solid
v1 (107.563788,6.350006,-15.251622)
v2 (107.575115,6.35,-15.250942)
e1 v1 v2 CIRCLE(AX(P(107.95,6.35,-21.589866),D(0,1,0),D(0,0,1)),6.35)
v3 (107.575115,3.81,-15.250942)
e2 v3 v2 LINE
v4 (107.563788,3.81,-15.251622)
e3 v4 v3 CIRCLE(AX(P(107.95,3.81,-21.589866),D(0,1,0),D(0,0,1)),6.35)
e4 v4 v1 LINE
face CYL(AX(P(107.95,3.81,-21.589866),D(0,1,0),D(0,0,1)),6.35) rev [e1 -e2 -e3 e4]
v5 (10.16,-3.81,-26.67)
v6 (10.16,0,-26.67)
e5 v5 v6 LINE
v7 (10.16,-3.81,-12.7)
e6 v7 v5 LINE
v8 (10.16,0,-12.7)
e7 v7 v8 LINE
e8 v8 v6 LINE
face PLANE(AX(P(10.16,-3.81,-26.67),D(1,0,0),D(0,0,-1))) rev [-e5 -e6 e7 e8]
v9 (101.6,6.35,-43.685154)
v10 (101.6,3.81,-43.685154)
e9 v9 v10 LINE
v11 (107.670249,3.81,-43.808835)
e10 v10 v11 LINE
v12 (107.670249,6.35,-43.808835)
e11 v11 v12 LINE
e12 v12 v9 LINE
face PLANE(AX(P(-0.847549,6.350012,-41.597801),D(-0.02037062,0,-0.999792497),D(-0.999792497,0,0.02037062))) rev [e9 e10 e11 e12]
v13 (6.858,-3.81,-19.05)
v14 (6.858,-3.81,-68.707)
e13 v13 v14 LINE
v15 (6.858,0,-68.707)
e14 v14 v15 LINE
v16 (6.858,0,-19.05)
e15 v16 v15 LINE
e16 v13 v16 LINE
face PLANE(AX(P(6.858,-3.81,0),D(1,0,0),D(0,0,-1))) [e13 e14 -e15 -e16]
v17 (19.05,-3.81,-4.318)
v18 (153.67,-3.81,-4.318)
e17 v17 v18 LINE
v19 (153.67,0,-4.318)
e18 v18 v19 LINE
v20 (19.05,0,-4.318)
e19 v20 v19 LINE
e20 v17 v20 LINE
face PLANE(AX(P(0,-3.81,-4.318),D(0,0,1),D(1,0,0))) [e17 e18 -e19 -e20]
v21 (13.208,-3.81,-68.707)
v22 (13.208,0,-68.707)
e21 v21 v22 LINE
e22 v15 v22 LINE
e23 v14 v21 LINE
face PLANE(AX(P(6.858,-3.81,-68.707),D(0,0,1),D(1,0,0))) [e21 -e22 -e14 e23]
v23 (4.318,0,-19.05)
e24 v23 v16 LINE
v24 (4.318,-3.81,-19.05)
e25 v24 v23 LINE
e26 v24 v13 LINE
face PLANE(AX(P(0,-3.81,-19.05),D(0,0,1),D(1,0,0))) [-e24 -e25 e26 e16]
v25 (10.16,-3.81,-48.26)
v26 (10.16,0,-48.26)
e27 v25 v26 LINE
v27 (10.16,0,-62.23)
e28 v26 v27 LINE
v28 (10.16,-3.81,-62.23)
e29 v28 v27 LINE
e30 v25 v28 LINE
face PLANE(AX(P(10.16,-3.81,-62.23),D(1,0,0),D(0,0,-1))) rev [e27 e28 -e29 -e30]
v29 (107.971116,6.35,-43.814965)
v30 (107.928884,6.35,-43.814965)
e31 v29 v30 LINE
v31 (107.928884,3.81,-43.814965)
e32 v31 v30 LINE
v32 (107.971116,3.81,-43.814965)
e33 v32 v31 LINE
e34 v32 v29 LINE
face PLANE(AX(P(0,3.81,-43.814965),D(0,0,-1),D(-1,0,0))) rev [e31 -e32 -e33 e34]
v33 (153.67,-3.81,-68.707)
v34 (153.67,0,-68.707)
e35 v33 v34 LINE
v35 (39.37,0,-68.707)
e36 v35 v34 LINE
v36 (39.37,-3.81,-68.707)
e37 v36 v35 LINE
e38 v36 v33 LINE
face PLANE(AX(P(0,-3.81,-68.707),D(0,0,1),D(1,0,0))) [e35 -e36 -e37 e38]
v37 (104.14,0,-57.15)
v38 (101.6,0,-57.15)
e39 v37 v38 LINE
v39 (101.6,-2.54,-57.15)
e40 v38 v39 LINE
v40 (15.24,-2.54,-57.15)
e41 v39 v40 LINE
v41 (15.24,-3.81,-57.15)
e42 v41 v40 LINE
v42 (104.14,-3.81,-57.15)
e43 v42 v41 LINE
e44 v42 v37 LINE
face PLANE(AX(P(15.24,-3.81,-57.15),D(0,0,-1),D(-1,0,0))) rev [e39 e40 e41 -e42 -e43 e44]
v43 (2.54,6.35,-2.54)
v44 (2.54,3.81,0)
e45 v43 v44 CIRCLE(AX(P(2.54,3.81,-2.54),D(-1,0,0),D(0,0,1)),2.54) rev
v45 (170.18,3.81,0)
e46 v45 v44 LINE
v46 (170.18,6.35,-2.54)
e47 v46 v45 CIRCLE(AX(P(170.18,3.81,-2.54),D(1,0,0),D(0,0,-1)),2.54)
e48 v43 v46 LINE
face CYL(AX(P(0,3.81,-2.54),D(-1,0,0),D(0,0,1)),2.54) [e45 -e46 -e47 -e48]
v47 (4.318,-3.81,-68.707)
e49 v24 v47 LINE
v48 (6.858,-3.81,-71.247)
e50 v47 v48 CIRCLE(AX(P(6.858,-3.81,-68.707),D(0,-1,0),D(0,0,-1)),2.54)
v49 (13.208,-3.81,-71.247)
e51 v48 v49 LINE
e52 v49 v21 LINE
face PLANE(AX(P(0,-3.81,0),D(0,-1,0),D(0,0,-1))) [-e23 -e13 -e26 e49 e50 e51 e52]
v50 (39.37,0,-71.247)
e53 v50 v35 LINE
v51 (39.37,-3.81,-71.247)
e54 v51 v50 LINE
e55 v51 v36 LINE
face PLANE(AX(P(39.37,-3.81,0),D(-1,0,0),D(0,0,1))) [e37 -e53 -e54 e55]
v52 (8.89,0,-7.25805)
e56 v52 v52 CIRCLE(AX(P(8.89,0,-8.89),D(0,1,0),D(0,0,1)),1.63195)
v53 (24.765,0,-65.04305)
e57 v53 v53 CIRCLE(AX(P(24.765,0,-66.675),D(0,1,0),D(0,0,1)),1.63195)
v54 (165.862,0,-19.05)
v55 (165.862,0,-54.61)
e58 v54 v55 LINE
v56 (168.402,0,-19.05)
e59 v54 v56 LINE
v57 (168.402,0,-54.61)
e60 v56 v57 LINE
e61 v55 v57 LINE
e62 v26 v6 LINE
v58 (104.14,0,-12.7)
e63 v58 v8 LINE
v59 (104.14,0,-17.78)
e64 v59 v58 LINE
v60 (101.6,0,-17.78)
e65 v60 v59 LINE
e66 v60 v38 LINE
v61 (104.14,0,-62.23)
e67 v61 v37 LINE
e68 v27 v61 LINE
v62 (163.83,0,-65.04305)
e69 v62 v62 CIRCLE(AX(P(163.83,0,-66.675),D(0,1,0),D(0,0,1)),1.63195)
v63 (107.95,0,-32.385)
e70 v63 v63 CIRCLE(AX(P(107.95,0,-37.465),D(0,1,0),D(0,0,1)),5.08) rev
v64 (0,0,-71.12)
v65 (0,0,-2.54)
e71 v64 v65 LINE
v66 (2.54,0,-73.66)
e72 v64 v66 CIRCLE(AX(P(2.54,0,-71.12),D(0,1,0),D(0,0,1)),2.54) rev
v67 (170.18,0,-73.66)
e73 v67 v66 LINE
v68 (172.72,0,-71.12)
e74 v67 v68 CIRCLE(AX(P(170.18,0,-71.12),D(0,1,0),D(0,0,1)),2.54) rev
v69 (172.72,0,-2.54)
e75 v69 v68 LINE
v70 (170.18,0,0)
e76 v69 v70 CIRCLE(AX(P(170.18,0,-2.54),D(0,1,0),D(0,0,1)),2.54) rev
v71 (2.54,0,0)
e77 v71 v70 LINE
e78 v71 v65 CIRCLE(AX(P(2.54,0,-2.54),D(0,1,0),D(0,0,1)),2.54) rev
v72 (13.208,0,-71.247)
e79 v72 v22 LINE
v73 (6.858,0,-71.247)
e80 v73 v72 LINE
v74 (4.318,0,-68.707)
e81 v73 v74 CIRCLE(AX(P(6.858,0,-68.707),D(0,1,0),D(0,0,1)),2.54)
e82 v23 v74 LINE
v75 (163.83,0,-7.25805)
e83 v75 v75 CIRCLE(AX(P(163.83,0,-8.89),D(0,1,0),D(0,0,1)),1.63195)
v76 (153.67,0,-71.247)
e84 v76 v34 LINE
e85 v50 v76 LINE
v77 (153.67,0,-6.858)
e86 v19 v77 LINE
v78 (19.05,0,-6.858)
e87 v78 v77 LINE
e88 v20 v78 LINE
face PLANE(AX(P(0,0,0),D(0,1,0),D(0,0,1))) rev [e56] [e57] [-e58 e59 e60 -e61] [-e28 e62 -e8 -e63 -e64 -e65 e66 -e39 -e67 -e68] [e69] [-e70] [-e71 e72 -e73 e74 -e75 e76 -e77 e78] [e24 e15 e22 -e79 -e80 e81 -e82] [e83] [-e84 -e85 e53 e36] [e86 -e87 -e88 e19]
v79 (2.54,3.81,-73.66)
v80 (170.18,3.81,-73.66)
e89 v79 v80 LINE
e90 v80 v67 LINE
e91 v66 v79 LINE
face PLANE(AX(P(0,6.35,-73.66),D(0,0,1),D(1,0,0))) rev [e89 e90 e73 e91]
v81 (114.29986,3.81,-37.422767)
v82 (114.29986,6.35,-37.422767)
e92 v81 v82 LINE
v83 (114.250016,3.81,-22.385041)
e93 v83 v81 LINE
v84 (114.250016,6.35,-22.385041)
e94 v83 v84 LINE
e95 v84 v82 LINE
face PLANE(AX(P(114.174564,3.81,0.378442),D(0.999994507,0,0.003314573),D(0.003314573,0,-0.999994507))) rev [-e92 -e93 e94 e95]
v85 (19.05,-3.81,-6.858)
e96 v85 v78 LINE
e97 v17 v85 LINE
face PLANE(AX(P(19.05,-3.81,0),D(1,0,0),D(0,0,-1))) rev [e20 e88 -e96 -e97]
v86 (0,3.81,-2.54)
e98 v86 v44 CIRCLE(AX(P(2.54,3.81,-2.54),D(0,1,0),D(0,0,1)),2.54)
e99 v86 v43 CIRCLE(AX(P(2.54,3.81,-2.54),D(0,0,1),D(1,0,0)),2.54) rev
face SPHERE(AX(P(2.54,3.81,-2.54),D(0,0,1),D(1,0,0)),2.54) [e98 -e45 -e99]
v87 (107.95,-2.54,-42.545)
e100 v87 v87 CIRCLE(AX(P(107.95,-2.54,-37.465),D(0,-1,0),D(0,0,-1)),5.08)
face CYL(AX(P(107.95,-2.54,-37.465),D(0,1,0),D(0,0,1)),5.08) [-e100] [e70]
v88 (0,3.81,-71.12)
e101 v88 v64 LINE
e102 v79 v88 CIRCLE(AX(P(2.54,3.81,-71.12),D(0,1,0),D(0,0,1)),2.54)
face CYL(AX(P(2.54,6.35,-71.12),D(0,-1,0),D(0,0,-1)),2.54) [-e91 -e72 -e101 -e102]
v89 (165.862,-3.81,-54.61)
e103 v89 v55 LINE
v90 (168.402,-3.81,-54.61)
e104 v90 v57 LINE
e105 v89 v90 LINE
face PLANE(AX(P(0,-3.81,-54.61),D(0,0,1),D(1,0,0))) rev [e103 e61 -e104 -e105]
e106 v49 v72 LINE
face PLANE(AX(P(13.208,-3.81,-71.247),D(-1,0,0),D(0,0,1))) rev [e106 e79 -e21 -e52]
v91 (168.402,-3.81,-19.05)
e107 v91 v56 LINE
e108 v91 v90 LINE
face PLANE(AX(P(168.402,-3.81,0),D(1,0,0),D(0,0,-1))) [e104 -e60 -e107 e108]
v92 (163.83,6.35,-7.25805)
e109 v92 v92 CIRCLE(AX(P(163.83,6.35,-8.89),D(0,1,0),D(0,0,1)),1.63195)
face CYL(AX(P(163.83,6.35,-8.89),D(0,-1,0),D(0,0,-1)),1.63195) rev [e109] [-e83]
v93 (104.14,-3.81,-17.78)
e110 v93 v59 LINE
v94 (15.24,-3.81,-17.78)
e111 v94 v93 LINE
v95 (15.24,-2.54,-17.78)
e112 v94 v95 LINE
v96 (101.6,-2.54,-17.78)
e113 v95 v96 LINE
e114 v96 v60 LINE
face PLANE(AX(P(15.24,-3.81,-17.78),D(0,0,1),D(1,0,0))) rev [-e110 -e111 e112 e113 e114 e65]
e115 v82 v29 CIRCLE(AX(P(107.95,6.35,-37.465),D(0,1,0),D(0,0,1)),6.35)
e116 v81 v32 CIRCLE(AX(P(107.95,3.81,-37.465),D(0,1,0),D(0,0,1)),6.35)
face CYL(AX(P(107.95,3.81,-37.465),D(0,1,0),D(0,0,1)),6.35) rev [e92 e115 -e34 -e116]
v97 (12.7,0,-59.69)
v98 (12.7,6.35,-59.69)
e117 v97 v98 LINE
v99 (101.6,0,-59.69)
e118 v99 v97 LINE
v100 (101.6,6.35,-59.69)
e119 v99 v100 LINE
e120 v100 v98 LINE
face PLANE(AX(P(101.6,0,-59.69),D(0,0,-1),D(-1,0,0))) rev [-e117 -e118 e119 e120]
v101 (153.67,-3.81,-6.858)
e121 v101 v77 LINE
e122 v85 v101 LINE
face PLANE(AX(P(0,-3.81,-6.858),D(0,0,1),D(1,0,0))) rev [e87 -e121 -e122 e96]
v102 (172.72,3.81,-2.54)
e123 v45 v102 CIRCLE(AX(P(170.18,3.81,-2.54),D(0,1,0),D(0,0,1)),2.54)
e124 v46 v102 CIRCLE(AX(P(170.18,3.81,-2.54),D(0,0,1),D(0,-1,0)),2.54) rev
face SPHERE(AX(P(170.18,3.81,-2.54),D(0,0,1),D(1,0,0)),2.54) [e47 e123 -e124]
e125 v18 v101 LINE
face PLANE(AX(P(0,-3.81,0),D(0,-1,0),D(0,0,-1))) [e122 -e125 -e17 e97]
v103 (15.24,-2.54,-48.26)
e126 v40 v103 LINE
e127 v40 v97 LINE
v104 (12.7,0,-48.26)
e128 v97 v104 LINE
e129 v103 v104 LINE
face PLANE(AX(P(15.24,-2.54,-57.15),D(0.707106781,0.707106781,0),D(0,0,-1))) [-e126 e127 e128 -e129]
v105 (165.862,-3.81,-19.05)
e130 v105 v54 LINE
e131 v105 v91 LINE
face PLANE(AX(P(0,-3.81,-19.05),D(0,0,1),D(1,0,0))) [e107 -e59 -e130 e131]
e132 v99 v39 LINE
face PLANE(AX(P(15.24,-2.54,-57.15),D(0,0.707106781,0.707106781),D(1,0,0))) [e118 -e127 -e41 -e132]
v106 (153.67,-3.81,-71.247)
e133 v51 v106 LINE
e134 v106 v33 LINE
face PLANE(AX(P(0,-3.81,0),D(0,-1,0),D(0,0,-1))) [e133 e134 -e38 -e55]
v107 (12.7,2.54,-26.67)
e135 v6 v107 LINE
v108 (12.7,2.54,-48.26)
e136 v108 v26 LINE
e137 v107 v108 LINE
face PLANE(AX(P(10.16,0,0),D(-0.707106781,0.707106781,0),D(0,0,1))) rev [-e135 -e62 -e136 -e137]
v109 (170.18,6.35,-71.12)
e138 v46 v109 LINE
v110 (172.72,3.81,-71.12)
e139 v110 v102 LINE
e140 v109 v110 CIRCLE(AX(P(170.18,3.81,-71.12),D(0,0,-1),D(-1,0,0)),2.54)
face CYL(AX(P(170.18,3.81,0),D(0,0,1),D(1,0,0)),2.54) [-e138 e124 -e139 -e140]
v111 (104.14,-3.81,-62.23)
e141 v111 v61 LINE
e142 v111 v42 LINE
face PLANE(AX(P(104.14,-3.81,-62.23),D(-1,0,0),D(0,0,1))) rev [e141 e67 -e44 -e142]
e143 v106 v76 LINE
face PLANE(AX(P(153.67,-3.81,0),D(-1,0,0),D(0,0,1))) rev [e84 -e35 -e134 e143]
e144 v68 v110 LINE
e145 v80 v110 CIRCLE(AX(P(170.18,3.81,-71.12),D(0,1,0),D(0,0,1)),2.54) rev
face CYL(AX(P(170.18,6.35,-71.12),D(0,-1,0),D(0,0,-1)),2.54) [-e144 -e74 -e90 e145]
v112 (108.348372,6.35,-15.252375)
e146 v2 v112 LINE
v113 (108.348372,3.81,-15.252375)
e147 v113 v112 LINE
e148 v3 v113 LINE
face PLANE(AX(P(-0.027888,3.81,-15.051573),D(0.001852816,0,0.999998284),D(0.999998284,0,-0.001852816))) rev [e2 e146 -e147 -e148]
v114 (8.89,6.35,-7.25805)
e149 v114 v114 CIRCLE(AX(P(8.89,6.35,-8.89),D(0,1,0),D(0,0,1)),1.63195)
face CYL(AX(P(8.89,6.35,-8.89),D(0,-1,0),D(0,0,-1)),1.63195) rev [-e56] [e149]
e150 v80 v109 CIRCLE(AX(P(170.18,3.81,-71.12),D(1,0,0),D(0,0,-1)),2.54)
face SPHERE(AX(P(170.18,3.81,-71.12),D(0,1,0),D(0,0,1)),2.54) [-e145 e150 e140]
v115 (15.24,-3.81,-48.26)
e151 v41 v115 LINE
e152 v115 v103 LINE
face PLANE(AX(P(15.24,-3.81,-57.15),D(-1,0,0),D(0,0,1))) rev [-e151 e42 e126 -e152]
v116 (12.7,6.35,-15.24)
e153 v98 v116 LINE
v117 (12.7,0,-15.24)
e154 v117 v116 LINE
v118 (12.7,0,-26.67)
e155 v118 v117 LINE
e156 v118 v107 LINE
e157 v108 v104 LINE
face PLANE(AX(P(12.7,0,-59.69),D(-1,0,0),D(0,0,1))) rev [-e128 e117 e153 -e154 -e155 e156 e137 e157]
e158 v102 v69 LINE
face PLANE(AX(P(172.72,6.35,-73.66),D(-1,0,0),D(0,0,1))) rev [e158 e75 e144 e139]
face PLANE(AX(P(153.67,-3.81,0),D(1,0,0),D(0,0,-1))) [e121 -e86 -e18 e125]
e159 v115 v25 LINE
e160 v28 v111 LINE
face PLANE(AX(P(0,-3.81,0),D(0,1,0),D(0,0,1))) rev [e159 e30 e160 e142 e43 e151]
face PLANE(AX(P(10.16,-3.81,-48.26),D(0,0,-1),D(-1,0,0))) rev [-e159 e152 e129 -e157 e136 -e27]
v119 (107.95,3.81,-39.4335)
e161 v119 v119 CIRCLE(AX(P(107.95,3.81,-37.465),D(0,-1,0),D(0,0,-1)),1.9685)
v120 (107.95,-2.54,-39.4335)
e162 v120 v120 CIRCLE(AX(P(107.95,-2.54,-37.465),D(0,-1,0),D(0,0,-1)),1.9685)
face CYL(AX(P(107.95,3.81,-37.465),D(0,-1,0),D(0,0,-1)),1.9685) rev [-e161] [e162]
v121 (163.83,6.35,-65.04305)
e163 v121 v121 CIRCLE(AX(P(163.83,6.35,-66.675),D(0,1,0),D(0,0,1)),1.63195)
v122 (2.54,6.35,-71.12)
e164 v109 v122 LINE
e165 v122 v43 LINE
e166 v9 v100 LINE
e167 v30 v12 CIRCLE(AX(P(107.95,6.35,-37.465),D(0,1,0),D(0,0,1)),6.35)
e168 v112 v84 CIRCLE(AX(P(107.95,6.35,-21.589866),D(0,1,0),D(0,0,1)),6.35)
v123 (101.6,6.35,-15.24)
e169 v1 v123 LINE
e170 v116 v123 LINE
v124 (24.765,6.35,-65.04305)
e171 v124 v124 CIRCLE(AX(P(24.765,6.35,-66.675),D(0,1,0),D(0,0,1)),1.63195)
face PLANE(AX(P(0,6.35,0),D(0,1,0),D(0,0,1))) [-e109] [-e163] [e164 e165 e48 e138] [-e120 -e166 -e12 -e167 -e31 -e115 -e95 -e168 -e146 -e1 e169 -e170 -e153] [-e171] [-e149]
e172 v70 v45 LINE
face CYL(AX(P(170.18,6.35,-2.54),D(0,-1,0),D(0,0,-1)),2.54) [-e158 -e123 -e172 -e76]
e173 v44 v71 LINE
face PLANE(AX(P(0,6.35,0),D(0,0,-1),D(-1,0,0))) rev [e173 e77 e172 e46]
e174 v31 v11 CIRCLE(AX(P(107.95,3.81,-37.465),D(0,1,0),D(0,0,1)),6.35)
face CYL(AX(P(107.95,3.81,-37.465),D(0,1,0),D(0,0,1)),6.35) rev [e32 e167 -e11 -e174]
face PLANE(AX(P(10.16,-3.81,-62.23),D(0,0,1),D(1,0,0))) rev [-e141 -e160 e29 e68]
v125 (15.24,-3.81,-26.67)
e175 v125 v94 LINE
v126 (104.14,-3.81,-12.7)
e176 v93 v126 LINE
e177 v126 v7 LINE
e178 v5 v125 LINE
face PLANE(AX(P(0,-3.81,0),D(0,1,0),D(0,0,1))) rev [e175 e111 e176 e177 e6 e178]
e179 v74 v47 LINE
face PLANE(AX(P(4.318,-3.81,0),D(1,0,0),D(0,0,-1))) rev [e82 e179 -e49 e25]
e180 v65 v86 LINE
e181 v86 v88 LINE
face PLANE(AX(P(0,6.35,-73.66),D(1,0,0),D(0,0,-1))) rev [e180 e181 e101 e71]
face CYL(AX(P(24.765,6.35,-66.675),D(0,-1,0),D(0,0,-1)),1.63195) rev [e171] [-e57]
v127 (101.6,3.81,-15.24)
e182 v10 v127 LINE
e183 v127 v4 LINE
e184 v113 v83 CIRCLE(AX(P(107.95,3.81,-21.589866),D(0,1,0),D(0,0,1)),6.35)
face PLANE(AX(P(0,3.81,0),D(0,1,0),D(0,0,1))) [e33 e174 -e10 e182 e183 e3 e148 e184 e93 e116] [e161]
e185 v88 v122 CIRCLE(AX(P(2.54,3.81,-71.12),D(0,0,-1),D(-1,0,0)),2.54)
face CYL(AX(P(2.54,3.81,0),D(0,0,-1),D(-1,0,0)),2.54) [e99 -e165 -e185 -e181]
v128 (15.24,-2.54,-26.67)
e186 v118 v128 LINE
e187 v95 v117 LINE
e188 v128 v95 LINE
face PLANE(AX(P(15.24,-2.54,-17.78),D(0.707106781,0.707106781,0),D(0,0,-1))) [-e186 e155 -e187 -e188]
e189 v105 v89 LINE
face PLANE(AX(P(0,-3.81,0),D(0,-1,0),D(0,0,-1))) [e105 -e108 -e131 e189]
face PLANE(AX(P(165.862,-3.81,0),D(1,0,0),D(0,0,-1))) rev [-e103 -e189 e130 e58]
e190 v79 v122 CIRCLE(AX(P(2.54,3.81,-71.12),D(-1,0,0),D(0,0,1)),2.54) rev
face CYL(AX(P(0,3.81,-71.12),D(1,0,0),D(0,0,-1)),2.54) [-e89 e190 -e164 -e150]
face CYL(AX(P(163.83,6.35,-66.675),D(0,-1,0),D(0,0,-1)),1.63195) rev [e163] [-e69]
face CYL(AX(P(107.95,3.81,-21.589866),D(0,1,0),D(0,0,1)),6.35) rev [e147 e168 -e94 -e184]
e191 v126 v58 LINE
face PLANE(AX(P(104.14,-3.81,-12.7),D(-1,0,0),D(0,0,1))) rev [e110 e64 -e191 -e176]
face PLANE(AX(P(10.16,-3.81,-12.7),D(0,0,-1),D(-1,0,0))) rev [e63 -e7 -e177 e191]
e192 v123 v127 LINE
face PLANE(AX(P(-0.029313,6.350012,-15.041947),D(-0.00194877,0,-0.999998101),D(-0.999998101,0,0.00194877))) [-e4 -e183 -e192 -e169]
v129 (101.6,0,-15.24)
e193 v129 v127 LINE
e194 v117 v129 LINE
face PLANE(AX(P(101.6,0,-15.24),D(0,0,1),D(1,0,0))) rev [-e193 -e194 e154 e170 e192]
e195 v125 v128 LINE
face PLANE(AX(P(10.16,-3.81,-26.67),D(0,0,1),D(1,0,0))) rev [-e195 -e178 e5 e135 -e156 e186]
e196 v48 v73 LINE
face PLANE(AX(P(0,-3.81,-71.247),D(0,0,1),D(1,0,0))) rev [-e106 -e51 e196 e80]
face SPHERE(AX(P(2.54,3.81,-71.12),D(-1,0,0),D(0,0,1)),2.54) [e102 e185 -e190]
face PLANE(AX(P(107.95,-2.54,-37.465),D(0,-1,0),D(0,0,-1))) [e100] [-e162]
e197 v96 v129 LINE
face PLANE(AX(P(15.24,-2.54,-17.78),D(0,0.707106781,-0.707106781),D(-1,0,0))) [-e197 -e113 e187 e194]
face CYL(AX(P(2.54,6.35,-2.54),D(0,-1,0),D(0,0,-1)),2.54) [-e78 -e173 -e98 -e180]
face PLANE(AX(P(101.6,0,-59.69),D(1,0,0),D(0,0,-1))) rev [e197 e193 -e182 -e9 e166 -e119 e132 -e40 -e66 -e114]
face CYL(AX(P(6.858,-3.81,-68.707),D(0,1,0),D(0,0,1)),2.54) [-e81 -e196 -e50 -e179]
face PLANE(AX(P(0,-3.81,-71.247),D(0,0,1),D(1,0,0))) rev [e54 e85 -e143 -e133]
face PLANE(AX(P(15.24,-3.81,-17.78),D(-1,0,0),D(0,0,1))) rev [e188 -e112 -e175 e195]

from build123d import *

# Parameters (mm, degrees)
SKETCH1_W               = 172.72
SKETCH1_H               = 73.66
SKETCH1_R               = 1.63195
BOSS_EXTRUDE1_DEPTH     = 6.35
SKETCH2_W               = 88.9
SKETCH2_H               = 44.45
CUT_EXTRUDE1_DEPTH      = 6.35
FILLET1_R               = 2.54
BOSS_EXTRUDE2_DEPTH     = 3.81
CHAMFER1_SIZE           = 2.54
CHAMFER2_SIZE           = 2.54
CUT_EXTRUDE3_DEPTH      = 189.045791232
CUT_EXTRUDE3_DEPTH_BACK = 2.54
CUT_EXTRUDE4_DEPTH      = 189.045791232
CUT_EXTRUDE4_DEPTH_BACK = 2.54
SKETCH8_R               = 5.08
BOSS_EXTRUDE3_DEPTH     = 2.54
SKETCH9_R               = 1.9685
CUT_EXTRUDE5_DEPTH      = 6.35
SKETCH10_W              = 134.62
SKETCH10_H              = 2.54
SKETCH10_W_2            = 114.3
SKETCH10_W_3            = 2.54
SKETCH10_H_2            = 35.56
SKETCH10_H_3            = 52.197
SKETCH10_W_4            = 6.35
BOSS_EXTRUDE4_DEPTH     = 3.81
FILLET2_R               = 2.54


with BuildPart() as part:
    # Sketch1 → Boss-Extrude1 (new body)
    with BuildSketch(Plane(origin=(0, 0, 0), x_dir=(1, 0, 0), z_dir=(0, 1, 0))):
        with Locations((86.36, 36.83)):
            Rectangle(SKETCH1_W, SKETCH1_H)
        with Locations(Location((24.765, 66.675, 0), (0, 0, 270))):
            Circle(SKETCH1_R, mode=Mode.SUBTRACT)
        with Locations(Location((8.89, 8.89, 0), (0, 0, 270))):
            Circle(SKETCH1_R, mode=Mode.SUBTRACT)
        with Locations(Location((163.83, 66.675, 0), (0, 0, 270))):
            Circle(SKETCH1_R, mode=Mode.SUBTRACT)
        with Locations(Location((163.83, 8.89, 0), (0, 0, 270))):
            Circle(SKETCH1_R, mode=Mode.SUBTRACT)
    extrude(amount=BOSS_EXTRUDE1_DEPTH)

    # Sketch2 → Cut-Extrude1 (cut)
    with BuildSketch(Plane(origin=(0, 6.35, 0), x_dir=(1, 0, 0), z_dir=(0, 1, 0))):
        with Locations((57.15, 37.465)):
            Rectangle(SKETCH2_W, SKETCH2_H)
    extrude(amount=-CUT_EXTRUDE1_DEPTH, mode=Mode.SUBTRACT)

    # Fillet1
    fillet1_edges = [part.edges().sort_by_distance(p)[0] for p in [
        (172.72, 6.35, -36.83),
        (86.36, 6.35, -73.66),
        (0, 6.35, -36.83),
        (0, 3.175, -73.66),
        (172.72, 3.175, -73.66),
        (172.72, 3.175, 0),
        (0, 3.175, 0),
        (86.36, 6.35, 0),
    ]]
    fillet(fillet1_edges, radius=FILLET1_R)

    # Sketch3 → Boss-Extrude2 (add)
    with BuildSketch(Plane.XZ):
        Polygon((10.16, -12.7), (104.14, -12.7), (104.14, -17.78), (15.24, -17.78), (15.24, -26.67), (10.16, -26.67), align=None)
        Polygon((10.16, -62.23), (104.14, -62.23), (104.14, -57.15), (15.24, -57.15), (15.24, -48.26), (10.16, -48.26), align=None)
    extrude(amount=BOSS_EXTRUDE2_DEPTH)

    # Chamfer1
    chamfer1_edges = [part.edges().sort_by_distance(p)[0] for p in [
        (12.7, 0, -37.465),
    ]]
    chamfer(chamfer1_edges, length=CHAMFER1_SIZE)

    # Chamfer2
    chamfer2_edges = [part.edges().sort_by_distance(p)[0] for p in [
        (58.42, 0, -17.78),
        (15.24, 0, -22.225),
        (15.24, 0, -52.705),
        (58.42, 0, -57.15),
    ]]
    chamfer(chamfer2_edges, length=CHAMFER2_SIZE - 0.0001)  # a hair under: the kernel refuses the full size

    # Sketch6 → Cut-Extrude3 (cut, two sides: drawn at the far end of the back side and taken through both)
    with BuildSketch(Plane(origin=(0, 6.35, 0), x_dir=(1, 0, 0), z_dir=(0, 1, 0)).offset(-CUT_EXTRUDE3_DEPTH_BACK)):
        with BuildLine():
            ThreePointArc((114.299859558, 37.422767419), (112.462469481, 41.932674919), (107.971116407, 43.814964889))
            Line((107.971116407, 43.814964889), (107.928883593, 43.814964889))
            ThreePointArc((107.928883593, 43.814964889), (103.452412358, 41.947656066), (101.6, 37.465))
            Line((101.6, 37.465), (101.6, 21.589866304))
            ThreePointArc((101.6, 21.589866304), (103.329230599, 17.234296291), (107.575115004, 15.250942007))
            Line((107.575115004, 15.250942007), (108.348372102, 15.252374712))
            ThreePointArc((108.348372102, 15.252374712), (112.842425973, 17.541821331), (114.250015644, 22.385041059))
            Line((114.250015644, 22.385041059), (114.299859558, 37.422767419))
        make_face()
    extrude(amount=CUT_EXTRUDE3_DEPTH + CUT_EXTRUDE3_DEPTH_BACK, mode=Mode.SUBTRACT)

    # Sketch7 → Cut-Extrude4 (cut, two sides: drawn at the far end of the back side and taken through both)
    with BuildSketch(Plane(origin=(0, 6.35, 0), x_dir=(1, 0, 0), z_dir=(0, 1, 0)).offset(-CUT_EXTRUDE4_DEPTH_BACK)):
        with BuildLine():
            Line((101.6, 43.68515436), (101.6, 37.465))
            ThreePointArc((101.6, 37.465), (103.362031135, 41.855107253), (107.670249351, 43.808834769))
            Line((107.670249351, 43.808834769), (101.6, 43.68515436))
        make_face()
        with BuildLine():
            ThreePointArc((107.563787548, 15.251622072), (103.325340603, 17.238426833), (101.6, 21.589866304))
            Line((101.6, 21.589866304), (101.6, 15.24))
            Line((101.6, 15.24), (107.563787548, 15.251622072))
        make_face()
    extrude(amount=CUT_EXTRUDE4_DEPTH + CUT_EXTRUDE4_DEPTH_BACK, mode=Mode.SUBTRACT)

    # Sketch8 → Boss-Extrude3 (add)
    with BuildSketch(Plane.XZ):
        with Locations(Location((107.95, -37.465, 0), (0, 0, 90))):
            Circle(SKETCH8_R)
    extrude(amount=BOSS_EXTRUDE3_DEPTH)

    # Sketch9 → Cut-Extrude5 (cut)
    with BuildSketch(Plane.XZ.offset(2.54)):
        with Locations(Location((107.95, -37.465, 0), (0, 0, 270))):
            Circle(SKETCH9_R)
    extrude(amount=-CUT_EXTRUDE5_DEPTH, mode=Mode.SUBTRACT)

    # Sketch10 → Boss-Extrude4 (add)
    with BuildSketch(Plane.XZ):
        with Locations((86.36, -5.588)):
            Rectangle(SKETCH10_W, SKETCH10_H)
        with Locations((96.52, -69.977)):
            Rectangle(SKETCH10_W_2, SKETCH10_H)
        with Locations((167.132, -36.83)):
            Rectangle(SKETCH10_W_3, SKETCH10_H_2)
        with Locations((5.588, -45.1485)):
            Rectangle(SKETCH10_W_3, SKETCH10_H_3)
        with Locations((10.033, -69.977)):
            Rectangle(SKETCH10_W_4, SKETCH10_H)
    extrude(amount=BOSS_EXTRUDE4_DEPTH)

    # Fillet2
    fillet2_edges = [part.edges().sort_by_distance(p)[0] for p in [
        (4.318, -1.905, -71.247),
    ]]
    fillet(fillet2_edges, radius=FILLET2_R)


solid = part.part
